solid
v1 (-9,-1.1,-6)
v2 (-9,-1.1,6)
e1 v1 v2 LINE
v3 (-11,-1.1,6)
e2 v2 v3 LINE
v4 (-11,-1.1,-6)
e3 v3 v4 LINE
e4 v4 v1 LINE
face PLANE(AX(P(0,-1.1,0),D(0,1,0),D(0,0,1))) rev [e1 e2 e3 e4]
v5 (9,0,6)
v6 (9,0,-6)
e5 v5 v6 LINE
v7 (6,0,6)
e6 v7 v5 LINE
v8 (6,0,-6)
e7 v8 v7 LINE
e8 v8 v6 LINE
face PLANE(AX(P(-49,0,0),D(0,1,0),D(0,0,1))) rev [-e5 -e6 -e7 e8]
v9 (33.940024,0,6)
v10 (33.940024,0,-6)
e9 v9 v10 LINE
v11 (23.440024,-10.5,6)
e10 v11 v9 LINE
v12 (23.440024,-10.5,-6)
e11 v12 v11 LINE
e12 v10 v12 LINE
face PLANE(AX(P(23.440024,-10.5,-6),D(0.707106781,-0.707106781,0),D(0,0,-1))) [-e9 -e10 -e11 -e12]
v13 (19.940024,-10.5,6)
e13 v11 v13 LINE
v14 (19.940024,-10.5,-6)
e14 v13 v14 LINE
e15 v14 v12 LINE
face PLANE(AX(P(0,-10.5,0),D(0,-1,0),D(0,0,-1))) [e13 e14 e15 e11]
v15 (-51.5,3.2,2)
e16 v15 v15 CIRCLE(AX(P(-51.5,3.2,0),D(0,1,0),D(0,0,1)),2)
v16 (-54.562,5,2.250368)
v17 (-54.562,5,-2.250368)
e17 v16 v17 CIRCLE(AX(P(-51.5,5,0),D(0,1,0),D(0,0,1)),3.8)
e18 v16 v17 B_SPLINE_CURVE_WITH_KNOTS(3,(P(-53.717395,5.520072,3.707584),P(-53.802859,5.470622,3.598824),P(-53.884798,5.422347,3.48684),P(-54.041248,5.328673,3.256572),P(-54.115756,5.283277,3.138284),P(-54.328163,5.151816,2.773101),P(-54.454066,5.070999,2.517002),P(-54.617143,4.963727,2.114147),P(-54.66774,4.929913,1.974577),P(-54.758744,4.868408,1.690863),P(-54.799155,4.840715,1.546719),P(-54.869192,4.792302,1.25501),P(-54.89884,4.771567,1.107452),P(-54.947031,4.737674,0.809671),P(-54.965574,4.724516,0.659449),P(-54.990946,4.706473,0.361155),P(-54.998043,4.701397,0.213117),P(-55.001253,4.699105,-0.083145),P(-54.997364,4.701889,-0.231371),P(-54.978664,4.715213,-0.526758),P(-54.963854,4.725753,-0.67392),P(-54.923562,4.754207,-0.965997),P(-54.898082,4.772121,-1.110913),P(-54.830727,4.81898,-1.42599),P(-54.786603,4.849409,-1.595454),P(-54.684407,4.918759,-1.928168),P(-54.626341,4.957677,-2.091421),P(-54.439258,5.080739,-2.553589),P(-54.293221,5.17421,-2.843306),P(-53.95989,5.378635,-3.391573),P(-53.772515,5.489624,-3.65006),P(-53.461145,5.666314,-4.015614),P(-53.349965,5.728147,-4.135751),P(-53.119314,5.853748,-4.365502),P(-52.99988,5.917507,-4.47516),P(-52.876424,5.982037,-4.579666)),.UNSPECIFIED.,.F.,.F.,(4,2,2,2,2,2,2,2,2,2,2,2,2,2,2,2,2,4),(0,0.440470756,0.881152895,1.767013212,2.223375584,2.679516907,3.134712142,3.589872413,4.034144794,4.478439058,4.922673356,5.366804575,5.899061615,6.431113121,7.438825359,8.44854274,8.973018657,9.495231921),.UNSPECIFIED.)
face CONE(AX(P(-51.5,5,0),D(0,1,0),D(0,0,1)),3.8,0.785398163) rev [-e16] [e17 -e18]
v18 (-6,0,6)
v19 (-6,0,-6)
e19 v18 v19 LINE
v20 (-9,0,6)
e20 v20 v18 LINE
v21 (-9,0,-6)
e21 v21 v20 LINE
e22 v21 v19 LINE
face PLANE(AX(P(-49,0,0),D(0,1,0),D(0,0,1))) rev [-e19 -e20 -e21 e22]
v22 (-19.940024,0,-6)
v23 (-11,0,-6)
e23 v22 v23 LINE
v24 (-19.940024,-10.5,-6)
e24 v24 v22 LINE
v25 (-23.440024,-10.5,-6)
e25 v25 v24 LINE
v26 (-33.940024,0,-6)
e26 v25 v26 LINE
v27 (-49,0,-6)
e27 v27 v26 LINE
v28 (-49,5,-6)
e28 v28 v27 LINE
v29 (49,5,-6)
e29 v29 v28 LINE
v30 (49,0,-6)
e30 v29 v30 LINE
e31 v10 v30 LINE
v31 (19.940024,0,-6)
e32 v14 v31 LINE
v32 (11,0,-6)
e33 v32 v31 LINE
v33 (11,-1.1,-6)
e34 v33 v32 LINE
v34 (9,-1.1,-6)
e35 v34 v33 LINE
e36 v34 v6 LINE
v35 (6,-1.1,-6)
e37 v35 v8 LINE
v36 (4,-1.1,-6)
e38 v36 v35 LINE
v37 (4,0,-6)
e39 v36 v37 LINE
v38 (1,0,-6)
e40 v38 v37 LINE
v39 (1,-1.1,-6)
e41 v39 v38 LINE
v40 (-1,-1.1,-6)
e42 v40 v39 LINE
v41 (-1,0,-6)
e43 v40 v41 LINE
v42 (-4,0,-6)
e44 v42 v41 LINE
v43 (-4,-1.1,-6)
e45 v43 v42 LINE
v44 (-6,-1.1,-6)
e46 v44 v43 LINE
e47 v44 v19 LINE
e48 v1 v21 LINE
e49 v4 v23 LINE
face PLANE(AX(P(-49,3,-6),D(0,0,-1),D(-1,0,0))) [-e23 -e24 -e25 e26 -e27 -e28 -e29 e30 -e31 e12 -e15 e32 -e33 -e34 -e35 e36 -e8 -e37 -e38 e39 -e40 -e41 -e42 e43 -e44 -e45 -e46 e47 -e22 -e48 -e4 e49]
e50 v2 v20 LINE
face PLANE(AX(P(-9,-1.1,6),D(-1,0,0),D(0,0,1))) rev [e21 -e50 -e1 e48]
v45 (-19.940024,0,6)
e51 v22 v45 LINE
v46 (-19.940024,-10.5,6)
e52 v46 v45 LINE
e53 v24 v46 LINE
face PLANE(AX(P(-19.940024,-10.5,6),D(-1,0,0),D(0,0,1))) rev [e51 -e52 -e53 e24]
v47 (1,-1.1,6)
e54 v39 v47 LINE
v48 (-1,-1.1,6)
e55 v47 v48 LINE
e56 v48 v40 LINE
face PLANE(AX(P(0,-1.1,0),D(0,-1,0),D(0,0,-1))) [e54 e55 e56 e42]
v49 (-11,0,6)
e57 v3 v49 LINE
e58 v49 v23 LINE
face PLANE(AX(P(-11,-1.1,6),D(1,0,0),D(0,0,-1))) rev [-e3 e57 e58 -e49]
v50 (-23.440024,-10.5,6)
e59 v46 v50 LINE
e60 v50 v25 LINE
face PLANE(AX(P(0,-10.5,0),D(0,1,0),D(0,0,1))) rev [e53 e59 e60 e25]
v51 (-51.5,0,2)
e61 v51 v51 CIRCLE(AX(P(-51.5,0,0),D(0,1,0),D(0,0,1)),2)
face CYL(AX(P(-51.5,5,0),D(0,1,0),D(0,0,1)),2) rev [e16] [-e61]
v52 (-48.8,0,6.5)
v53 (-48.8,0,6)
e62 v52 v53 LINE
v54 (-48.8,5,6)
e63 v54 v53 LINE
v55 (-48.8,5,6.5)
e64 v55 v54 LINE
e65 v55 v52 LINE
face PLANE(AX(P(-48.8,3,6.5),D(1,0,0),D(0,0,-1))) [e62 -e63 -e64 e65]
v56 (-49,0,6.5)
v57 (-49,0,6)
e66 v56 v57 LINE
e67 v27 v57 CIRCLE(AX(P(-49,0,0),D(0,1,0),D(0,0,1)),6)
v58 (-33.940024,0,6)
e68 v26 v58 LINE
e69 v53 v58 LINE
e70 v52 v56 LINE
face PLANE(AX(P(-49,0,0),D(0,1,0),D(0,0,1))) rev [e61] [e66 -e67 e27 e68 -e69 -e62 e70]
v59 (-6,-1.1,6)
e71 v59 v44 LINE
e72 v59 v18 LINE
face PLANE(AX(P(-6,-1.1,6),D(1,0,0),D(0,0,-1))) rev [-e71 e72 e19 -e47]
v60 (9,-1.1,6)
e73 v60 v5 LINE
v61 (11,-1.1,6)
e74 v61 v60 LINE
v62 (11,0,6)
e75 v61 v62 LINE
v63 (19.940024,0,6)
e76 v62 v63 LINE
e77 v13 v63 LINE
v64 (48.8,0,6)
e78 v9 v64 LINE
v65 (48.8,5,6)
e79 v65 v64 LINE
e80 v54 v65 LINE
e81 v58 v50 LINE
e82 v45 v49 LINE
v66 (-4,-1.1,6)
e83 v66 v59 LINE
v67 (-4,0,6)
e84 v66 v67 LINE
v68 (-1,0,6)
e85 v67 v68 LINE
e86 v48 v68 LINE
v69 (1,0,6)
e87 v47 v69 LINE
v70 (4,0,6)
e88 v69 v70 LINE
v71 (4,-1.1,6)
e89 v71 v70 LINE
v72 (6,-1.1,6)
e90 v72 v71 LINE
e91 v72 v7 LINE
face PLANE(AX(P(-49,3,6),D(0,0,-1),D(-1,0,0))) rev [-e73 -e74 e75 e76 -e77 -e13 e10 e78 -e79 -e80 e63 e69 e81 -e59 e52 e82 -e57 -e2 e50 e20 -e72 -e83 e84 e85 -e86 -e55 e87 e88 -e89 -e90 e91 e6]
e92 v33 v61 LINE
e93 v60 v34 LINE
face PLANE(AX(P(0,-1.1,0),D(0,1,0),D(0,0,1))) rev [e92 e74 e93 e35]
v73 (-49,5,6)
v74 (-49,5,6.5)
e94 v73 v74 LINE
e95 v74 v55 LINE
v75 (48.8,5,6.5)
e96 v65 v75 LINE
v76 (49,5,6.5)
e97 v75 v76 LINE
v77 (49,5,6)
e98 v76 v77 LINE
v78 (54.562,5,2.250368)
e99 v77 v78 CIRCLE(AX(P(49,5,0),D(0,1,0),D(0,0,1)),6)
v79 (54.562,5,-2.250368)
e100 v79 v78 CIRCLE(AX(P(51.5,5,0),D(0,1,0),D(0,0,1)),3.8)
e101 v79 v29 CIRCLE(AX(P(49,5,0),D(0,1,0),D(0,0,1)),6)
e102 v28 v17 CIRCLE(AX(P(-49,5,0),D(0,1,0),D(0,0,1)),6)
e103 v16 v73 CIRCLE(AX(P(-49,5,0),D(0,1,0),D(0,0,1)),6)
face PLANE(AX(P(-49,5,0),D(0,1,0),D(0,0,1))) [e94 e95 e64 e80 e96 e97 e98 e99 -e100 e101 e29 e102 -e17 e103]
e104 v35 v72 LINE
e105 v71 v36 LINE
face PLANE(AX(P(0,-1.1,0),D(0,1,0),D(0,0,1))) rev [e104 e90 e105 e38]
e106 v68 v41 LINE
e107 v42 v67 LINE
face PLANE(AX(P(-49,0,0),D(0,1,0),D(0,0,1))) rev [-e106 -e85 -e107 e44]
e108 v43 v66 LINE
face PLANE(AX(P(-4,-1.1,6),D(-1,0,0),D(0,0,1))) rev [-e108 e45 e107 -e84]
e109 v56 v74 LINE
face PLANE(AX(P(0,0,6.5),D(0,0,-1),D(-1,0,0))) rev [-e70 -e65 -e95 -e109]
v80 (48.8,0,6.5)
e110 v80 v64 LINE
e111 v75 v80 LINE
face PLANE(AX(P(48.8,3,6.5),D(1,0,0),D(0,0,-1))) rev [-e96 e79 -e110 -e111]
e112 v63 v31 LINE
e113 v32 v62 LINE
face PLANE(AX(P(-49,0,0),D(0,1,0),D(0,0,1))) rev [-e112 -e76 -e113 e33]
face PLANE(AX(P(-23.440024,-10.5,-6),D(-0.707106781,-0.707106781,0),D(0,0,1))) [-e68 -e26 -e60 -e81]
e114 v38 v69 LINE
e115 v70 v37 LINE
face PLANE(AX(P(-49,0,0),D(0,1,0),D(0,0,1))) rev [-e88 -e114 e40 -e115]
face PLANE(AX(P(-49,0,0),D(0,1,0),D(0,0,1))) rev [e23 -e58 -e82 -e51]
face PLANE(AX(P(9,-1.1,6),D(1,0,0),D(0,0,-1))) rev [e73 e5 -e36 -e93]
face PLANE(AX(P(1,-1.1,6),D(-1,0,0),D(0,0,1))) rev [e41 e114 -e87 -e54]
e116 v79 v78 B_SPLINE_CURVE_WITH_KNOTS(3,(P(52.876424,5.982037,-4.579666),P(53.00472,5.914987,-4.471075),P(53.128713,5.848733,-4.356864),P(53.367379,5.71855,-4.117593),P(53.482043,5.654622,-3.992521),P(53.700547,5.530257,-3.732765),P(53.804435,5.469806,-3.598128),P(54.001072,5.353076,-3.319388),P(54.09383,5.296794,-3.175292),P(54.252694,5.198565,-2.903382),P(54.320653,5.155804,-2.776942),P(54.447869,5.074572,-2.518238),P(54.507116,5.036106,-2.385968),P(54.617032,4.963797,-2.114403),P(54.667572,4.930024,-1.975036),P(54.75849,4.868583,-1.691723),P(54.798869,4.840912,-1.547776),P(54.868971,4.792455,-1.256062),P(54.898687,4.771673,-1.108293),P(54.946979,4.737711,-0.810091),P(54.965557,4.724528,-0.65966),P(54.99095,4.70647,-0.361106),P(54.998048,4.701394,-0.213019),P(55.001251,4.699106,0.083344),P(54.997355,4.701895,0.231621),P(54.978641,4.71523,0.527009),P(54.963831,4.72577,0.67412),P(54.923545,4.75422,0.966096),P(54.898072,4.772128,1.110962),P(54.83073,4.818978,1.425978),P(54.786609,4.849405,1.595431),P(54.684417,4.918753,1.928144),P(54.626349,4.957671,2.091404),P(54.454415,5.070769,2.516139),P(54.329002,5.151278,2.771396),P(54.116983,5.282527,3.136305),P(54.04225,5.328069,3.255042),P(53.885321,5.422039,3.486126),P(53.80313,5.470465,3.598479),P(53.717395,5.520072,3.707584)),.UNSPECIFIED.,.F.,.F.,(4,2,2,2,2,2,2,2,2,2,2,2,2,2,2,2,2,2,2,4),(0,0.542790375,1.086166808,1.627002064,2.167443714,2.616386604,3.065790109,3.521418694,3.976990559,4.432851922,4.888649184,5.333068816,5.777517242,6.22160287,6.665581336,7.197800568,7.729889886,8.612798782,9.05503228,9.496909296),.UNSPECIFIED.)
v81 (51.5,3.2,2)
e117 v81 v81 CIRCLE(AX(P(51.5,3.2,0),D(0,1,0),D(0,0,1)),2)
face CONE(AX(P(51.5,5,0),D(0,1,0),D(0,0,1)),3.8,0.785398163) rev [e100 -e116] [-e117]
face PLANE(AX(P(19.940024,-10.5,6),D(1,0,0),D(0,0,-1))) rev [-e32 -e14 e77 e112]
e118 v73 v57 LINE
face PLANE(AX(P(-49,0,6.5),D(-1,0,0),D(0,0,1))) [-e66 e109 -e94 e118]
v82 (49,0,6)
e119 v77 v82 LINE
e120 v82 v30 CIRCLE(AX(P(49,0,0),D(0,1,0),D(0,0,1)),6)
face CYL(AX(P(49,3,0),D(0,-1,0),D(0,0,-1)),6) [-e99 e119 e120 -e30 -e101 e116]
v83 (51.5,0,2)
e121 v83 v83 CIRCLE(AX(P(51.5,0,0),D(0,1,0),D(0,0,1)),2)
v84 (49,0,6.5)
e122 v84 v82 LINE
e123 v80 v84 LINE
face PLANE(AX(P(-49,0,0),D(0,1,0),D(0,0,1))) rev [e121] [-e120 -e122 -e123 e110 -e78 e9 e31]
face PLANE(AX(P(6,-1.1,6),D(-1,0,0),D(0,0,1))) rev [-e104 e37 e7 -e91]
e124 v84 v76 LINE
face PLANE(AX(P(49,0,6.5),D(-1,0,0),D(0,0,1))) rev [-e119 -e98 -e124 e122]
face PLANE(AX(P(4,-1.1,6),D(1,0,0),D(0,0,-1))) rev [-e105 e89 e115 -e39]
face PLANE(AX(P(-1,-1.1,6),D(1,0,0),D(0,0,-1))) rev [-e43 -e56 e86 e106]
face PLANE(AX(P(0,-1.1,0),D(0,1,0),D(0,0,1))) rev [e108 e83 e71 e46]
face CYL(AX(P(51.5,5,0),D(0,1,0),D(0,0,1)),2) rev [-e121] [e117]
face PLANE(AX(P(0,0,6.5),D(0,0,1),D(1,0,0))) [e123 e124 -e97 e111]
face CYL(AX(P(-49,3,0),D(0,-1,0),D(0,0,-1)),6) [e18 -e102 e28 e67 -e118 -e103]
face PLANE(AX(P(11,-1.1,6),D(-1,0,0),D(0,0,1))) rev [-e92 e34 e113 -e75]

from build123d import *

# Parameters (mm, degrees)
SKETCH1_R                     = 1.5
BOSS_EXTRUDE1_DEPTH           = 3
SKETCH4_W                     = 3.5
SKETCH4_H                     = 12
BOSS_EXTRUDE3_DEPTH           = 10.5
SKETCH5_W                     = 2
SKETCH5_H                     = 12
BOSS_EXTRUDE4_DEPTH           = 1.1
SKETCH6_W                     = 0.2
SKETCH6_H                     = 3
BOSS_EXTRUDE5_DEPTH           = 0.5
CHAMFER1_SIZE                 = 10.5
SKETCH10_R                    = 1.5
BOSS_EXTRUDE6_DEPTH           = 2
CSK_FOR_M4_SFHCS1_D           = 4
CSK_FOR_M4_SFHCS1_DEPTH       = 30.798278762
CSK_FOR_M4_SFHCS1_CSINK_D     = 7.6
CSK_FOR_M4_SFHCS1_CSINK_ANGLE = 90
CSK_FOR_M4_SFHCS1_TIP         = 1.201721238


with BuildPart() as part:
    # Sketch1 → Boss-Extrude1 (new body)
    with BuildSketch(Plane(origin=(0, 0, 0), x_dir=(1, 0, 0), z_dir=(0, 1, 0))):
        with BuildLine():
            Line((-49, 6), (49, 6))
            ThreePointArc((49, 6), (55, 0), (49, -6))
            Line((49, -6), (-49, -6))
            ThreePointArc((-49, -6), (-55, 0), (-49, 6))
        make_face()
        with Locations(Location((-51.5, 0, 0), (0, 0, 270))):
            Circle(SKETCH1_R, mode=Mode.SUBTRACT)
        with Locations(Location((51.5, 0, 0), (0, 0, 270))):
            Circle(SKETCH1_R, mode=Mode.SUBTRACT)
    extrude(amount=BOSS_EXTRUDE1_DEPTH)

    # Sketch4 → Boss-Extrude3 (add)
    with BuildSketch(Plane.XZ):
        with Locations((-21.690023983, 0)):
            Rectangle(SKETCH4_W, SKETCH4_H)
        with Locations((21.690023983, 0)):
            Rectangle(SKETCH4_W, SKETCH4_H)
    extrude(amount=BOSS_EXTRUDE3_DEPTH)

    # Sketch5 → Boss-Extrude4 (add)
    with BuildSketch(Plane.XZ):
        with Locations((5, 0)):
            Rectangle(SKETCH5_W, SKETCH5_H)
        Rectangle(SKETCH5_W, SKETCH5_H)
        with Locations((10, 0)):
            Rectangle(SKETCH5_W, SKETCH5_H)
        with Locations((-5, 0)):
            Rectangle(SKETCH5_W, SKETCH5_H)
        with Locations((-10, 0)):
            Rectangle(SKETCH5_W, SKETCH5_H)
    extrude(amount=BOSS_EXTRUDE4_DEPTH)

    # Sketch6 → Boss-Extrude5 (add)
    with BuildSketch(Plane.XY.offset(6)):
        with Locations((48.9, 1.5)):
            Rectangle(SKETCH6_W, SKETCH6_H)
        with Locations((-48.9, 1.5)):
            Rectangle(SKETCH6_W, SKETCH6_H)
    extrude(amount=BOSS_EXTRUDE5_DEPTH)

    # Chamfer1
    chamfer1_edges = [part.edges().sort_by_distance(p)[0] for p in [
        (-23.440023983, 0, 0),
        (23.440023983, 0, 0),
    ]]
    chamfer(chamfer1_edges, length=CHAMFER1_SIZE - 0.0001)  # a hair under: the kernel refuses the full size

    # Sketch10 → Boss-Extrude6 (add)
    with BuildSketch(Plane(origin=(0, 3, 0), x_dir=(1, 0, 0), z_dir=(0, 1, 0))):
        with BuildLine():
            Line((-49, -6), (-49, -6.5))
            Line((-49, -6.5), (-48.8, -6.5))
            Line((-48.8, -6.5), (-48.8, -6))
            Line((-48.8, -6), (48.8, -6))
            Line((48.8, -6), (48.8, -6.5))
            Line((48.8, -6.5), (49, -6.5))
            Line((49, -6.5), (49, -6))
            ThreePointArc((49, -6), (55, 0), (49, 6))
            Line((49, 6), (-49, 6))
            ThreePointArc((-49, 6), (-55, 0), (-49, -6))
        make_face()
        with Locations(Location((-51.5, 0, 0), (0, 0, 270))):
            Circle(SKETCH10_R, mode=Mode.SUBTRACT)
        with Locations(Location((51.5, 0, 0), (0, 0, 270))):
            Circle(SKETCH10_R, mode=Mode.SUBTRACT)
    extrude(amount=BOSS_EXTRUDE6_DEPTH)

    # CSK for M4 SFHCS1
    with Locations(Plane(origin=(0, 5, 0), x_dir=(1, 0, 0), z_dir=(0, 1, 0))):
        with Locations((51.5, 0), (-51.5, 0)):
            CounterSinkHole(CSK_FOR_M4_SFHCS1_D / 2, CSK_FOR_M4_SFHCS1_CSINK_D / 2, depth=CSK_FOR_M4_SFHCS1_DEPTH, counter_sink_angle=CSK_FOR_M4_SFHCS1_CSINK_ANGLE)
            with Locations((0, 0, -(CSK_FOR_M4_SFHCS1_DEPTH + CSK_FOR_M4_SFHCS1_TIP / 2))):  # 118° drill point
                Cone(0, CSK_FOR_M4_SFHCS1_D / 2, CSK_FOR_M4_SFHCS1_TIP, mode=Mode.SUBTRACT)


solid = part.part
